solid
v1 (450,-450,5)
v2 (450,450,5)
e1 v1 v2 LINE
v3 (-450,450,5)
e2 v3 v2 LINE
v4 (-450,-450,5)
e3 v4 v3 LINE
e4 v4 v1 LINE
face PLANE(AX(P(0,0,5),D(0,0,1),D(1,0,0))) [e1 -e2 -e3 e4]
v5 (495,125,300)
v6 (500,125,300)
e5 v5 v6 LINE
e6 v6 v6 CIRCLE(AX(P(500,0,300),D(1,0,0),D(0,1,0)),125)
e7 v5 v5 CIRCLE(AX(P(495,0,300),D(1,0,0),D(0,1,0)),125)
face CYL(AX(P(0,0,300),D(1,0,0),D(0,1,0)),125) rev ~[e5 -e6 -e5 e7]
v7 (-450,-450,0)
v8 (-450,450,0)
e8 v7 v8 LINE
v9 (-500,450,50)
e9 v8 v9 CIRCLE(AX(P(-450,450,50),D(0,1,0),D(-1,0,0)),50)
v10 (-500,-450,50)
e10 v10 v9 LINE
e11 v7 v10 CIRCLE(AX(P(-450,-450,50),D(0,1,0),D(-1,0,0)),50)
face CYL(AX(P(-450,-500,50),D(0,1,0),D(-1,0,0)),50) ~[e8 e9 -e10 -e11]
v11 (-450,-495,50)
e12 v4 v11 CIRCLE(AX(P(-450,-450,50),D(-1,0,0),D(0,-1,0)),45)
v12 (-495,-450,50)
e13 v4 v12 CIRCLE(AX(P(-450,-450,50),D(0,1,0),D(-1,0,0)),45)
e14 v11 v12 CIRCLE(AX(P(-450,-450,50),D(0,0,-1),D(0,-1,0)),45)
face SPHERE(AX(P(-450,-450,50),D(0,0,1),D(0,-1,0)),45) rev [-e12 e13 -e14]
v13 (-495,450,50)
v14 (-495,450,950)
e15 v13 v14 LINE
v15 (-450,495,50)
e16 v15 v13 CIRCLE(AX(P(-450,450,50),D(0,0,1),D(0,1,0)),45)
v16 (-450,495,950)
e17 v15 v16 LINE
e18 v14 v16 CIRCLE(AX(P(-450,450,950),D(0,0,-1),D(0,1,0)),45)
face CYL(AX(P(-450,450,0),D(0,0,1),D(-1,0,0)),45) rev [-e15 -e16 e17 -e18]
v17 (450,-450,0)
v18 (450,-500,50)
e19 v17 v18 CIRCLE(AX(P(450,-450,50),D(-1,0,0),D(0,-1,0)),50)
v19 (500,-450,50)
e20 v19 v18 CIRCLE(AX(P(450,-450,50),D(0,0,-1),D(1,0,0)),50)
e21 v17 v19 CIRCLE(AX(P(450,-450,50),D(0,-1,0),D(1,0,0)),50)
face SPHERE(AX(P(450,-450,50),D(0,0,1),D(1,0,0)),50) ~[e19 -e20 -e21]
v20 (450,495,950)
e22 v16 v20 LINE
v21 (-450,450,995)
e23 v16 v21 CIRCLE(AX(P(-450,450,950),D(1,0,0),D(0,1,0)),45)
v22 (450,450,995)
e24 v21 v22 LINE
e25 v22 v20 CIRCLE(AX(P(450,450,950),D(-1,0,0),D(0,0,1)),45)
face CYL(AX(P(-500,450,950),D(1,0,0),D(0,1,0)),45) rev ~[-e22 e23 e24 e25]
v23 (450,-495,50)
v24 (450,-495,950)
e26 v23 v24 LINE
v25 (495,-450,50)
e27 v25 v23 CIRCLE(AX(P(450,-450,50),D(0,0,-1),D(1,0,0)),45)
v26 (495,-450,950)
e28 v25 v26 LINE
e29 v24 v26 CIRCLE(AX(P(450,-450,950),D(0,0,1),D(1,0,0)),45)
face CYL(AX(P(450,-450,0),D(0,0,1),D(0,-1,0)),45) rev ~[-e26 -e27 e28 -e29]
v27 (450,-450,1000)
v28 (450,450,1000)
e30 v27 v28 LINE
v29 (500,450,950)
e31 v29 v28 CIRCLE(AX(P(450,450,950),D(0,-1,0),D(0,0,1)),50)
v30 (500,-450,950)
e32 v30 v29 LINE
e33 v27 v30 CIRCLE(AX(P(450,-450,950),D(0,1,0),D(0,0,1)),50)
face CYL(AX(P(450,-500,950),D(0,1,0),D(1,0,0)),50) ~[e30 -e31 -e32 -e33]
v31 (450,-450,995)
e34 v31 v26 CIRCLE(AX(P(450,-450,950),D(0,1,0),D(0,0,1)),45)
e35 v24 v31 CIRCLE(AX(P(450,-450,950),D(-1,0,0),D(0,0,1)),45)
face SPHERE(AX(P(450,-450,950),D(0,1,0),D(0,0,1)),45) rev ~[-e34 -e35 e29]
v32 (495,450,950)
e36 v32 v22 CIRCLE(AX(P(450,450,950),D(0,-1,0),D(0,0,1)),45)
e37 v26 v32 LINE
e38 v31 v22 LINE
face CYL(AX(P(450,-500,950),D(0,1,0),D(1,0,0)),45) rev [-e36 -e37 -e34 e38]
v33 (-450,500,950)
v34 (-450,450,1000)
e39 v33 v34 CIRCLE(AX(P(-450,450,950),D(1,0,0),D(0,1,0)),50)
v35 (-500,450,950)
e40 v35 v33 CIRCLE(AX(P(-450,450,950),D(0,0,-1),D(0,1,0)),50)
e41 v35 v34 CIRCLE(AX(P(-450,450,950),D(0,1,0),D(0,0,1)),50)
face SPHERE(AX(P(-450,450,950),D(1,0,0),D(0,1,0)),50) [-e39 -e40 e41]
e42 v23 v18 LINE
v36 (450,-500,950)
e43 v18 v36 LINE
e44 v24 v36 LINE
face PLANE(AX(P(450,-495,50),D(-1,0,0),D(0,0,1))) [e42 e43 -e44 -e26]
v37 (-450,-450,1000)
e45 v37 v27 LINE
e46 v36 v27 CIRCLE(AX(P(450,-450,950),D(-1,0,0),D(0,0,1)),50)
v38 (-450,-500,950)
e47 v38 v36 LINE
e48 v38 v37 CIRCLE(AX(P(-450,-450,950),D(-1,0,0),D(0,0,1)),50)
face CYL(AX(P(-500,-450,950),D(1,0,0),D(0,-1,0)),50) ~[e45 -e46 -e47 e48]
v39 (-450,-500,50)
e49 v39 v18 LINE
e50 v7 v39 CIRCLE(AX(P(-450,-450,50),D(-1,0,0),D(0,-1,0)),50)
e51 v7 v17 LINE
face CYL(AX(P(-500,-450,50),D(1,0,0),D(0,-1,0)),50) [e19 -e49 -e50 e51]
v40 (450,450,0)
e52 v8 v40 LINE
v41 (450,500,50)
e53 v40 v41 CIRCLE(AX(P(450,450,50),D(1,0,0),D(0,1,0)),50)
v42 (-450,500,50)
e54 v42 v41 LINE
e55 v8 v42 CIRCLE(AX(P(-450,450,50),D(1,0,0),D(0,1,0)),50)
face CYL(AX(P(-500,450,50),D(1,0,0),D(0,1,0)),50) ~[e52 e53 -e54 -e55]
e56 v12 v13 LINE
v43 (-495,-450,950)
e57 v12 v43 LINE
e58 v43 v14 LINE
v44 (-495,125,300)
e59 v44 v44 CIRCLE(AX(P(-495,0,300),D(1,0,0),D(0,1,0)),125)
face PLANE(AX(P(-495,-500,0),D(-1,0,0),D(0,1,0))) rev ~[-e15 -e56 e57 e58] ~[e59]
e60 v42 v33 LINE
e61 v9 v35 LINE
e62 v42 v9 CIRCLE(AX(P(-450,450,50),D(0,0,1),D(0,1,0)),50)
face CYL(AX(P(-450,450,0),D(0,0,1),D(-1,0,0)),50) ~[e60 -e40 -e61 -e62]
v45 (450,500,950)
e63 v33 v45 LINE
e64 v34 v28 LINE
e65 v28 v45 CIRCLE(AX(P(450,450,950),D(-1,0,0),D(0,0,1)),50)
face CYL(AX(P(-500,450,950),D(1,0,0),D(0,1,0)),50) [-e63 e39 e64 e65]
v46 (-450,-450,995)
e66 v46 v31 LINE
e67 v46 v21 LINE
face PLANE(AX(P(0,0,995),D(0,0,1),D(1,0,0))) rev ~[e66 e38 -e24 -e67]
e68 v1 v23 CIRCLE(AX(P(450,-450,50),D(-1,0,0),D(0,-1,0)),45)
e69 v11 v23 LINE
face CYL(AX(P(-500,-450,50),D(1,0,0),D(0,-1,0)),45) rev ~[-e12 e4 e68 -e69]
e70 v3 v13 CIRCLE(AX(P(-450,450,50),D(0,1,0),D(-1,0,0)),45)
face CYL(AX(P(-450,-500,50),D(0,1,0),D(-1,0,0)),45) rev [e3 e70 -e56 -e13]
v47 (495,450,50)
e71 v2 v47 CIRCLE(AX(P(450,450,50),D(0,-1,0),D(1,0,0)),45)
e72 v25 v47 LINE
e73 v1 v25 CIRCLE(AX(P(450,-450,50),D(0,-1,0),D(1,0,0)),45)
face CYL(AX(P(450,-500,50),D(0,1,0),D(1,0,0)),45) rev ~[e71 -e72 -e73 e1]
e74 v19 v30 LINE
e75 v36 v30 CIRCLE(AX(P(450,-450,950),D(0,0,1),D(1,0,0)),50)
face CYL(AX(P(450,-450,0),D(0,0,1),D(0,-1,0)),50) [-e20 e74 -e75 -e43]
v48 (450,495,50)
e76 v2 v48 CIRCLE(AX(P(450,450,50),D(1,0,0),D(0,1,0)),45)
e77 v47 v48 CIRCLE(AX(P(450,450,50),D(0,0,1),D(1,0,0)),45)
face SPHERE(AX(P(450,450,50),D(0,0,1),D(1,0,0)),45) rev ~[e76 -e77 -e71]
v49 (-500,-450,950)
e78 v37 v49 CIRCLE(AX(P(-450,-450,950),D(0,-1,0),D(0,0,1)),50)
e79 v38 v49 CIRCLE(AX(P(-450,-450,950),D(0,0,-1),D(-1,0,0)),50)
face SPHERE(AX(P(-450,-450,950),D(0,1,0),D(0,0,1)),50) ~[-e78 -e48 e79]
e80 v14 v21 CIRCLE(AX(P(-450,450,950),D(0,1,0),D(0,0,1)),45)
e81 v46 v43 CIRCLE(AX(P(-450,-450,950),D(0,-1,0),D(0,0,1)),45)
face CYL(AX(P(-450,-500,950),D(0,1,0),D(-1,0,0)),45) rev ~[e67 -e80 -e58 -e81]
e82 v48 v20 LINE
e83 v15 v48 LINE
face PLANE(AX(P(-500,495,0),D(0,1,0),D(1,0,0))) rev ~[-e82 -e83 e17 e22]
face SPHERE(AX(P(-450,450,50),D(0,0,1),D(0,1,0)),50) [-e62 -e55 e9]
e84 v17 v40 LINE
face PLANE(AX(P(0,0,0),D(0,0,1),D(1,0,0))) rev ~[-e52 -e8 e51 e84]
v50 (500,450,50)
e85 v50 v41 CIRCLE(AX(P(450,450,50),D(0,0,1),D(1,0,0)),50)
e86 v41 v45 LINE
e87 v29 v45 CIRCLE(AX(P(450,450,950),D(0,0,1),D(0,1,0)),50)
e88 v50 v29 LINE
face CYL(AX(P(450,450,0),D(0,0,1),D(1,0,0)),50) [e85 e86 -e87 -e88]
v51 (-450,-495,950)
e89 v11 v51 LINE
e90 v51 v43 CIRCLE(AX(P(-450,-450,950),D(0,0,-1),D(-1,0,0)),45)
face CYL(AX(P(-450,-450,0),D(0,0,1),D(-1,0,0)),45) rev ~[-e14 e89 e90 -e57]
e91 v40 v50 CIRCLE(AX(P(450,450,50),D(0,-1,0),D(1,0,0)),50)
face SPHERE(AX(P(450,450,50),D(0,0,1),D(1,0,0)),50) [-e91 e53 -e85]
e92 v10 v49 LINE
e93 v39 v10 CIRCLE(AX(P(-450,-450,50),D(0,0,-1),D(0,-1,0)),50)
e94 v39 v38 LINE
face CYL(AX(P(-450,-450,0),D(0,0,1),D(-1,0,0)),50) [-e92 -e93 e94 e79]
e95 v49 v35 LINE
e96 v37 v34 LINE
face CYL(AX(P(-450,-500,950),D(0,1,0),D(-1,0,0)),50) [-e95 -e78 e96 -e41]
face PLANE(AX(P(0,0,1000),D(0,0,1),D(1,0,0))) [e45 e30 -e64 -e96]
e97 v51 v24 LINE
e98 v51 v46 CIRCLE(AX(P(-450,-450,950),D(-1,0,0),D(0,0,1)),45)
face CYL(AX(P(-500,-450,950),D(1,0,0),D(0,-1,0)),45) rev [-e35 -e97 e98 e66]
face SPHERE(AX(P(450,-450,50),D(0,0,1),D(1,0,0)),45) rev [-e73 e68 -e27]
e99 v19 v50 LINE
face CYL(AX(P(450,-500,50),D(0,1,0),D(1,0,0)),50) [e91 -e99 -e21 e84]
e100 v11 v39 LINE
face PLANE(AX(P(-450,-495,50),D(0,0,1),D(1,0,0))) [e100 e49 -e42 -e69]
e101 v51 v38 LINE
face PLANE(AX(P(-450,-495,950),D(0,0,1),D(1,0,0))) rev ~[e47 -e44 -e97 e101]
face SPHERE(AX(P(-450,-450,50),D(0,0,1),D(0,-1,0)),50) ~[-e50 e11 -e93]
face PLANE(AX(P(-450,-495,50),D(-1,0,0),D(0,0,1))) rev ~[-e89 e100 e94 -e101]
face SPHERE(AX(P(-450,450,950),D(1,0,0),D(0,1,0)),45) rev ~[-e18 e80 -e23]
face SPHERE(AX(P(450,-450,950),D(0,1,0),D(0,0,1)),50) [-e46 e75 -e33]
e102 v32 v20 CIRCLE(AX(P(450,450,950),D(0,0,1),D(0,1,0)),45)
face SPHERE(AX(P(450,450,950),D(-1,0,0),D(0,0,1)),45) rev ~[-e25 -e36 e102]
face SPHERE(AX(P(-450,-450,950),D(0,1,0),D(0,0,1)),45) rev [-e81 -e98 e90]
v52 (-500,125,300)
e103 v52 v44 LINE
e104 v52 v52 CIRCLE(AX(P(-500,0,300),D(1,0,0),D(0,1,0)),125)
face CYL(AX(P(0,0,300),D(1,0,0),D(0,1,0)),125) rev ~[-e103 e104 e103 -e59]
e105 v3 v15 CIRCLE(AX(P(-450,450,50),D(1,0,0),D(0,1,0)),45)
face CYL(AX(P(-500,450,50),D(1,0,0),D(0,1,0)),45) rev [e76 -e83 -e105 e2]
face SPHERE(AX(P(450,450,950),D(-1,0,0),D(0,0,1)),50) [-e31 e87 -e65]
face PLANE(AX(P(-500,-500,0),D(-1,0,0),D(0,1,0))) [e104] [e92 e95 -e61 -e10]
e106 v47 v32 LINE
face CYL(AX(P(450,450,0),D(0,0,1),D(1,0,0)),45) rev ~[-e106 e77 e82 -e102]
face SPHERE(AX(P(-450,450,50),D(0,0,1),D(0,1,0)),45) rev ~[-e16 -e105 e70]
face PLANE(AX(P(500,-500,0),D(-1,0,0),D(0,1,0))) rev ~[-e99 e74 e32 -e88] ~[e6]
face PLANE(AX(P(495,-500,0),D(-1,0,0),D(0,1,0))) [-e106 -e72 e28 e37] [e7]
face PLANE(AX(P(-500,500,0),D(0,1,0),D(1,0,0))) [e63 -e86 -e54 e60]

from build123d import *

# Parameters (mm, degrees)
F0_W     = 1000
F0_H     = 1000
F1_DEPTH = 1000
F2_R     = 50
F3_T     = -5
F4_R     = 125
F5_DEPTH = 650


# Not quite as in the source:
# - a shell that OpenCascade refuses in one call is made with other operations: the cavity is built on its own and cut out


with BuildPart() as f1:
    # F0 (on Top) → F1 (new body)
    with BuildSketch(Plane.XY):
        Rectangle(F0_W, F0_H)
    extrude(amount=F1_DEPTH)

    # F2
    f2_edges = [f1.edges().sort_by_distance(p)[0] for p in [
        (0, 500, 1000),
        (-500, 500, 500),
        (-500, 0, 1000),
        (500, 0, 1000),
        (500, 500, 500),
        (0, -500, 1000),
        (-500, -500, 500),
        (500, -500, 500),
        (500, 0, 0),
        (0, -500, 0),
        (0, 500, 0),
        (-500, 0, 0),
    ]]
    fillet(f2_edges, radius=F2_R)

    # F3: a shell. OpenCascade refuses it in one call, so the cavity is built on its own and cut out:
    # the body offset inwards by the wall thickness, plus a prism from it out through each open face.
    f3_core = offset(f1.part, amount=F3_T, mode=Mode.PRIVATE)
    f3_exits = [f3_core.faces().sort_by_distance(p)[0] for p in [
        (0, -495, 500),
    ]]
    add(f3_core, mode=Mode.SUBTRACT)
    extrude(f3_exits, amount=-F3_T, mode=Mode.SUBTRACT)

    # F4 (on Right) → F5 (cut, symmetric)
    with BuildSketch(Plane.YZ):
        with Locations((0, 300)):
            Circle(F4_R)
    extrude(amount=F5_DEPTH, both=True, mode=Mode.SUBTRACT)


solid = f1.part
